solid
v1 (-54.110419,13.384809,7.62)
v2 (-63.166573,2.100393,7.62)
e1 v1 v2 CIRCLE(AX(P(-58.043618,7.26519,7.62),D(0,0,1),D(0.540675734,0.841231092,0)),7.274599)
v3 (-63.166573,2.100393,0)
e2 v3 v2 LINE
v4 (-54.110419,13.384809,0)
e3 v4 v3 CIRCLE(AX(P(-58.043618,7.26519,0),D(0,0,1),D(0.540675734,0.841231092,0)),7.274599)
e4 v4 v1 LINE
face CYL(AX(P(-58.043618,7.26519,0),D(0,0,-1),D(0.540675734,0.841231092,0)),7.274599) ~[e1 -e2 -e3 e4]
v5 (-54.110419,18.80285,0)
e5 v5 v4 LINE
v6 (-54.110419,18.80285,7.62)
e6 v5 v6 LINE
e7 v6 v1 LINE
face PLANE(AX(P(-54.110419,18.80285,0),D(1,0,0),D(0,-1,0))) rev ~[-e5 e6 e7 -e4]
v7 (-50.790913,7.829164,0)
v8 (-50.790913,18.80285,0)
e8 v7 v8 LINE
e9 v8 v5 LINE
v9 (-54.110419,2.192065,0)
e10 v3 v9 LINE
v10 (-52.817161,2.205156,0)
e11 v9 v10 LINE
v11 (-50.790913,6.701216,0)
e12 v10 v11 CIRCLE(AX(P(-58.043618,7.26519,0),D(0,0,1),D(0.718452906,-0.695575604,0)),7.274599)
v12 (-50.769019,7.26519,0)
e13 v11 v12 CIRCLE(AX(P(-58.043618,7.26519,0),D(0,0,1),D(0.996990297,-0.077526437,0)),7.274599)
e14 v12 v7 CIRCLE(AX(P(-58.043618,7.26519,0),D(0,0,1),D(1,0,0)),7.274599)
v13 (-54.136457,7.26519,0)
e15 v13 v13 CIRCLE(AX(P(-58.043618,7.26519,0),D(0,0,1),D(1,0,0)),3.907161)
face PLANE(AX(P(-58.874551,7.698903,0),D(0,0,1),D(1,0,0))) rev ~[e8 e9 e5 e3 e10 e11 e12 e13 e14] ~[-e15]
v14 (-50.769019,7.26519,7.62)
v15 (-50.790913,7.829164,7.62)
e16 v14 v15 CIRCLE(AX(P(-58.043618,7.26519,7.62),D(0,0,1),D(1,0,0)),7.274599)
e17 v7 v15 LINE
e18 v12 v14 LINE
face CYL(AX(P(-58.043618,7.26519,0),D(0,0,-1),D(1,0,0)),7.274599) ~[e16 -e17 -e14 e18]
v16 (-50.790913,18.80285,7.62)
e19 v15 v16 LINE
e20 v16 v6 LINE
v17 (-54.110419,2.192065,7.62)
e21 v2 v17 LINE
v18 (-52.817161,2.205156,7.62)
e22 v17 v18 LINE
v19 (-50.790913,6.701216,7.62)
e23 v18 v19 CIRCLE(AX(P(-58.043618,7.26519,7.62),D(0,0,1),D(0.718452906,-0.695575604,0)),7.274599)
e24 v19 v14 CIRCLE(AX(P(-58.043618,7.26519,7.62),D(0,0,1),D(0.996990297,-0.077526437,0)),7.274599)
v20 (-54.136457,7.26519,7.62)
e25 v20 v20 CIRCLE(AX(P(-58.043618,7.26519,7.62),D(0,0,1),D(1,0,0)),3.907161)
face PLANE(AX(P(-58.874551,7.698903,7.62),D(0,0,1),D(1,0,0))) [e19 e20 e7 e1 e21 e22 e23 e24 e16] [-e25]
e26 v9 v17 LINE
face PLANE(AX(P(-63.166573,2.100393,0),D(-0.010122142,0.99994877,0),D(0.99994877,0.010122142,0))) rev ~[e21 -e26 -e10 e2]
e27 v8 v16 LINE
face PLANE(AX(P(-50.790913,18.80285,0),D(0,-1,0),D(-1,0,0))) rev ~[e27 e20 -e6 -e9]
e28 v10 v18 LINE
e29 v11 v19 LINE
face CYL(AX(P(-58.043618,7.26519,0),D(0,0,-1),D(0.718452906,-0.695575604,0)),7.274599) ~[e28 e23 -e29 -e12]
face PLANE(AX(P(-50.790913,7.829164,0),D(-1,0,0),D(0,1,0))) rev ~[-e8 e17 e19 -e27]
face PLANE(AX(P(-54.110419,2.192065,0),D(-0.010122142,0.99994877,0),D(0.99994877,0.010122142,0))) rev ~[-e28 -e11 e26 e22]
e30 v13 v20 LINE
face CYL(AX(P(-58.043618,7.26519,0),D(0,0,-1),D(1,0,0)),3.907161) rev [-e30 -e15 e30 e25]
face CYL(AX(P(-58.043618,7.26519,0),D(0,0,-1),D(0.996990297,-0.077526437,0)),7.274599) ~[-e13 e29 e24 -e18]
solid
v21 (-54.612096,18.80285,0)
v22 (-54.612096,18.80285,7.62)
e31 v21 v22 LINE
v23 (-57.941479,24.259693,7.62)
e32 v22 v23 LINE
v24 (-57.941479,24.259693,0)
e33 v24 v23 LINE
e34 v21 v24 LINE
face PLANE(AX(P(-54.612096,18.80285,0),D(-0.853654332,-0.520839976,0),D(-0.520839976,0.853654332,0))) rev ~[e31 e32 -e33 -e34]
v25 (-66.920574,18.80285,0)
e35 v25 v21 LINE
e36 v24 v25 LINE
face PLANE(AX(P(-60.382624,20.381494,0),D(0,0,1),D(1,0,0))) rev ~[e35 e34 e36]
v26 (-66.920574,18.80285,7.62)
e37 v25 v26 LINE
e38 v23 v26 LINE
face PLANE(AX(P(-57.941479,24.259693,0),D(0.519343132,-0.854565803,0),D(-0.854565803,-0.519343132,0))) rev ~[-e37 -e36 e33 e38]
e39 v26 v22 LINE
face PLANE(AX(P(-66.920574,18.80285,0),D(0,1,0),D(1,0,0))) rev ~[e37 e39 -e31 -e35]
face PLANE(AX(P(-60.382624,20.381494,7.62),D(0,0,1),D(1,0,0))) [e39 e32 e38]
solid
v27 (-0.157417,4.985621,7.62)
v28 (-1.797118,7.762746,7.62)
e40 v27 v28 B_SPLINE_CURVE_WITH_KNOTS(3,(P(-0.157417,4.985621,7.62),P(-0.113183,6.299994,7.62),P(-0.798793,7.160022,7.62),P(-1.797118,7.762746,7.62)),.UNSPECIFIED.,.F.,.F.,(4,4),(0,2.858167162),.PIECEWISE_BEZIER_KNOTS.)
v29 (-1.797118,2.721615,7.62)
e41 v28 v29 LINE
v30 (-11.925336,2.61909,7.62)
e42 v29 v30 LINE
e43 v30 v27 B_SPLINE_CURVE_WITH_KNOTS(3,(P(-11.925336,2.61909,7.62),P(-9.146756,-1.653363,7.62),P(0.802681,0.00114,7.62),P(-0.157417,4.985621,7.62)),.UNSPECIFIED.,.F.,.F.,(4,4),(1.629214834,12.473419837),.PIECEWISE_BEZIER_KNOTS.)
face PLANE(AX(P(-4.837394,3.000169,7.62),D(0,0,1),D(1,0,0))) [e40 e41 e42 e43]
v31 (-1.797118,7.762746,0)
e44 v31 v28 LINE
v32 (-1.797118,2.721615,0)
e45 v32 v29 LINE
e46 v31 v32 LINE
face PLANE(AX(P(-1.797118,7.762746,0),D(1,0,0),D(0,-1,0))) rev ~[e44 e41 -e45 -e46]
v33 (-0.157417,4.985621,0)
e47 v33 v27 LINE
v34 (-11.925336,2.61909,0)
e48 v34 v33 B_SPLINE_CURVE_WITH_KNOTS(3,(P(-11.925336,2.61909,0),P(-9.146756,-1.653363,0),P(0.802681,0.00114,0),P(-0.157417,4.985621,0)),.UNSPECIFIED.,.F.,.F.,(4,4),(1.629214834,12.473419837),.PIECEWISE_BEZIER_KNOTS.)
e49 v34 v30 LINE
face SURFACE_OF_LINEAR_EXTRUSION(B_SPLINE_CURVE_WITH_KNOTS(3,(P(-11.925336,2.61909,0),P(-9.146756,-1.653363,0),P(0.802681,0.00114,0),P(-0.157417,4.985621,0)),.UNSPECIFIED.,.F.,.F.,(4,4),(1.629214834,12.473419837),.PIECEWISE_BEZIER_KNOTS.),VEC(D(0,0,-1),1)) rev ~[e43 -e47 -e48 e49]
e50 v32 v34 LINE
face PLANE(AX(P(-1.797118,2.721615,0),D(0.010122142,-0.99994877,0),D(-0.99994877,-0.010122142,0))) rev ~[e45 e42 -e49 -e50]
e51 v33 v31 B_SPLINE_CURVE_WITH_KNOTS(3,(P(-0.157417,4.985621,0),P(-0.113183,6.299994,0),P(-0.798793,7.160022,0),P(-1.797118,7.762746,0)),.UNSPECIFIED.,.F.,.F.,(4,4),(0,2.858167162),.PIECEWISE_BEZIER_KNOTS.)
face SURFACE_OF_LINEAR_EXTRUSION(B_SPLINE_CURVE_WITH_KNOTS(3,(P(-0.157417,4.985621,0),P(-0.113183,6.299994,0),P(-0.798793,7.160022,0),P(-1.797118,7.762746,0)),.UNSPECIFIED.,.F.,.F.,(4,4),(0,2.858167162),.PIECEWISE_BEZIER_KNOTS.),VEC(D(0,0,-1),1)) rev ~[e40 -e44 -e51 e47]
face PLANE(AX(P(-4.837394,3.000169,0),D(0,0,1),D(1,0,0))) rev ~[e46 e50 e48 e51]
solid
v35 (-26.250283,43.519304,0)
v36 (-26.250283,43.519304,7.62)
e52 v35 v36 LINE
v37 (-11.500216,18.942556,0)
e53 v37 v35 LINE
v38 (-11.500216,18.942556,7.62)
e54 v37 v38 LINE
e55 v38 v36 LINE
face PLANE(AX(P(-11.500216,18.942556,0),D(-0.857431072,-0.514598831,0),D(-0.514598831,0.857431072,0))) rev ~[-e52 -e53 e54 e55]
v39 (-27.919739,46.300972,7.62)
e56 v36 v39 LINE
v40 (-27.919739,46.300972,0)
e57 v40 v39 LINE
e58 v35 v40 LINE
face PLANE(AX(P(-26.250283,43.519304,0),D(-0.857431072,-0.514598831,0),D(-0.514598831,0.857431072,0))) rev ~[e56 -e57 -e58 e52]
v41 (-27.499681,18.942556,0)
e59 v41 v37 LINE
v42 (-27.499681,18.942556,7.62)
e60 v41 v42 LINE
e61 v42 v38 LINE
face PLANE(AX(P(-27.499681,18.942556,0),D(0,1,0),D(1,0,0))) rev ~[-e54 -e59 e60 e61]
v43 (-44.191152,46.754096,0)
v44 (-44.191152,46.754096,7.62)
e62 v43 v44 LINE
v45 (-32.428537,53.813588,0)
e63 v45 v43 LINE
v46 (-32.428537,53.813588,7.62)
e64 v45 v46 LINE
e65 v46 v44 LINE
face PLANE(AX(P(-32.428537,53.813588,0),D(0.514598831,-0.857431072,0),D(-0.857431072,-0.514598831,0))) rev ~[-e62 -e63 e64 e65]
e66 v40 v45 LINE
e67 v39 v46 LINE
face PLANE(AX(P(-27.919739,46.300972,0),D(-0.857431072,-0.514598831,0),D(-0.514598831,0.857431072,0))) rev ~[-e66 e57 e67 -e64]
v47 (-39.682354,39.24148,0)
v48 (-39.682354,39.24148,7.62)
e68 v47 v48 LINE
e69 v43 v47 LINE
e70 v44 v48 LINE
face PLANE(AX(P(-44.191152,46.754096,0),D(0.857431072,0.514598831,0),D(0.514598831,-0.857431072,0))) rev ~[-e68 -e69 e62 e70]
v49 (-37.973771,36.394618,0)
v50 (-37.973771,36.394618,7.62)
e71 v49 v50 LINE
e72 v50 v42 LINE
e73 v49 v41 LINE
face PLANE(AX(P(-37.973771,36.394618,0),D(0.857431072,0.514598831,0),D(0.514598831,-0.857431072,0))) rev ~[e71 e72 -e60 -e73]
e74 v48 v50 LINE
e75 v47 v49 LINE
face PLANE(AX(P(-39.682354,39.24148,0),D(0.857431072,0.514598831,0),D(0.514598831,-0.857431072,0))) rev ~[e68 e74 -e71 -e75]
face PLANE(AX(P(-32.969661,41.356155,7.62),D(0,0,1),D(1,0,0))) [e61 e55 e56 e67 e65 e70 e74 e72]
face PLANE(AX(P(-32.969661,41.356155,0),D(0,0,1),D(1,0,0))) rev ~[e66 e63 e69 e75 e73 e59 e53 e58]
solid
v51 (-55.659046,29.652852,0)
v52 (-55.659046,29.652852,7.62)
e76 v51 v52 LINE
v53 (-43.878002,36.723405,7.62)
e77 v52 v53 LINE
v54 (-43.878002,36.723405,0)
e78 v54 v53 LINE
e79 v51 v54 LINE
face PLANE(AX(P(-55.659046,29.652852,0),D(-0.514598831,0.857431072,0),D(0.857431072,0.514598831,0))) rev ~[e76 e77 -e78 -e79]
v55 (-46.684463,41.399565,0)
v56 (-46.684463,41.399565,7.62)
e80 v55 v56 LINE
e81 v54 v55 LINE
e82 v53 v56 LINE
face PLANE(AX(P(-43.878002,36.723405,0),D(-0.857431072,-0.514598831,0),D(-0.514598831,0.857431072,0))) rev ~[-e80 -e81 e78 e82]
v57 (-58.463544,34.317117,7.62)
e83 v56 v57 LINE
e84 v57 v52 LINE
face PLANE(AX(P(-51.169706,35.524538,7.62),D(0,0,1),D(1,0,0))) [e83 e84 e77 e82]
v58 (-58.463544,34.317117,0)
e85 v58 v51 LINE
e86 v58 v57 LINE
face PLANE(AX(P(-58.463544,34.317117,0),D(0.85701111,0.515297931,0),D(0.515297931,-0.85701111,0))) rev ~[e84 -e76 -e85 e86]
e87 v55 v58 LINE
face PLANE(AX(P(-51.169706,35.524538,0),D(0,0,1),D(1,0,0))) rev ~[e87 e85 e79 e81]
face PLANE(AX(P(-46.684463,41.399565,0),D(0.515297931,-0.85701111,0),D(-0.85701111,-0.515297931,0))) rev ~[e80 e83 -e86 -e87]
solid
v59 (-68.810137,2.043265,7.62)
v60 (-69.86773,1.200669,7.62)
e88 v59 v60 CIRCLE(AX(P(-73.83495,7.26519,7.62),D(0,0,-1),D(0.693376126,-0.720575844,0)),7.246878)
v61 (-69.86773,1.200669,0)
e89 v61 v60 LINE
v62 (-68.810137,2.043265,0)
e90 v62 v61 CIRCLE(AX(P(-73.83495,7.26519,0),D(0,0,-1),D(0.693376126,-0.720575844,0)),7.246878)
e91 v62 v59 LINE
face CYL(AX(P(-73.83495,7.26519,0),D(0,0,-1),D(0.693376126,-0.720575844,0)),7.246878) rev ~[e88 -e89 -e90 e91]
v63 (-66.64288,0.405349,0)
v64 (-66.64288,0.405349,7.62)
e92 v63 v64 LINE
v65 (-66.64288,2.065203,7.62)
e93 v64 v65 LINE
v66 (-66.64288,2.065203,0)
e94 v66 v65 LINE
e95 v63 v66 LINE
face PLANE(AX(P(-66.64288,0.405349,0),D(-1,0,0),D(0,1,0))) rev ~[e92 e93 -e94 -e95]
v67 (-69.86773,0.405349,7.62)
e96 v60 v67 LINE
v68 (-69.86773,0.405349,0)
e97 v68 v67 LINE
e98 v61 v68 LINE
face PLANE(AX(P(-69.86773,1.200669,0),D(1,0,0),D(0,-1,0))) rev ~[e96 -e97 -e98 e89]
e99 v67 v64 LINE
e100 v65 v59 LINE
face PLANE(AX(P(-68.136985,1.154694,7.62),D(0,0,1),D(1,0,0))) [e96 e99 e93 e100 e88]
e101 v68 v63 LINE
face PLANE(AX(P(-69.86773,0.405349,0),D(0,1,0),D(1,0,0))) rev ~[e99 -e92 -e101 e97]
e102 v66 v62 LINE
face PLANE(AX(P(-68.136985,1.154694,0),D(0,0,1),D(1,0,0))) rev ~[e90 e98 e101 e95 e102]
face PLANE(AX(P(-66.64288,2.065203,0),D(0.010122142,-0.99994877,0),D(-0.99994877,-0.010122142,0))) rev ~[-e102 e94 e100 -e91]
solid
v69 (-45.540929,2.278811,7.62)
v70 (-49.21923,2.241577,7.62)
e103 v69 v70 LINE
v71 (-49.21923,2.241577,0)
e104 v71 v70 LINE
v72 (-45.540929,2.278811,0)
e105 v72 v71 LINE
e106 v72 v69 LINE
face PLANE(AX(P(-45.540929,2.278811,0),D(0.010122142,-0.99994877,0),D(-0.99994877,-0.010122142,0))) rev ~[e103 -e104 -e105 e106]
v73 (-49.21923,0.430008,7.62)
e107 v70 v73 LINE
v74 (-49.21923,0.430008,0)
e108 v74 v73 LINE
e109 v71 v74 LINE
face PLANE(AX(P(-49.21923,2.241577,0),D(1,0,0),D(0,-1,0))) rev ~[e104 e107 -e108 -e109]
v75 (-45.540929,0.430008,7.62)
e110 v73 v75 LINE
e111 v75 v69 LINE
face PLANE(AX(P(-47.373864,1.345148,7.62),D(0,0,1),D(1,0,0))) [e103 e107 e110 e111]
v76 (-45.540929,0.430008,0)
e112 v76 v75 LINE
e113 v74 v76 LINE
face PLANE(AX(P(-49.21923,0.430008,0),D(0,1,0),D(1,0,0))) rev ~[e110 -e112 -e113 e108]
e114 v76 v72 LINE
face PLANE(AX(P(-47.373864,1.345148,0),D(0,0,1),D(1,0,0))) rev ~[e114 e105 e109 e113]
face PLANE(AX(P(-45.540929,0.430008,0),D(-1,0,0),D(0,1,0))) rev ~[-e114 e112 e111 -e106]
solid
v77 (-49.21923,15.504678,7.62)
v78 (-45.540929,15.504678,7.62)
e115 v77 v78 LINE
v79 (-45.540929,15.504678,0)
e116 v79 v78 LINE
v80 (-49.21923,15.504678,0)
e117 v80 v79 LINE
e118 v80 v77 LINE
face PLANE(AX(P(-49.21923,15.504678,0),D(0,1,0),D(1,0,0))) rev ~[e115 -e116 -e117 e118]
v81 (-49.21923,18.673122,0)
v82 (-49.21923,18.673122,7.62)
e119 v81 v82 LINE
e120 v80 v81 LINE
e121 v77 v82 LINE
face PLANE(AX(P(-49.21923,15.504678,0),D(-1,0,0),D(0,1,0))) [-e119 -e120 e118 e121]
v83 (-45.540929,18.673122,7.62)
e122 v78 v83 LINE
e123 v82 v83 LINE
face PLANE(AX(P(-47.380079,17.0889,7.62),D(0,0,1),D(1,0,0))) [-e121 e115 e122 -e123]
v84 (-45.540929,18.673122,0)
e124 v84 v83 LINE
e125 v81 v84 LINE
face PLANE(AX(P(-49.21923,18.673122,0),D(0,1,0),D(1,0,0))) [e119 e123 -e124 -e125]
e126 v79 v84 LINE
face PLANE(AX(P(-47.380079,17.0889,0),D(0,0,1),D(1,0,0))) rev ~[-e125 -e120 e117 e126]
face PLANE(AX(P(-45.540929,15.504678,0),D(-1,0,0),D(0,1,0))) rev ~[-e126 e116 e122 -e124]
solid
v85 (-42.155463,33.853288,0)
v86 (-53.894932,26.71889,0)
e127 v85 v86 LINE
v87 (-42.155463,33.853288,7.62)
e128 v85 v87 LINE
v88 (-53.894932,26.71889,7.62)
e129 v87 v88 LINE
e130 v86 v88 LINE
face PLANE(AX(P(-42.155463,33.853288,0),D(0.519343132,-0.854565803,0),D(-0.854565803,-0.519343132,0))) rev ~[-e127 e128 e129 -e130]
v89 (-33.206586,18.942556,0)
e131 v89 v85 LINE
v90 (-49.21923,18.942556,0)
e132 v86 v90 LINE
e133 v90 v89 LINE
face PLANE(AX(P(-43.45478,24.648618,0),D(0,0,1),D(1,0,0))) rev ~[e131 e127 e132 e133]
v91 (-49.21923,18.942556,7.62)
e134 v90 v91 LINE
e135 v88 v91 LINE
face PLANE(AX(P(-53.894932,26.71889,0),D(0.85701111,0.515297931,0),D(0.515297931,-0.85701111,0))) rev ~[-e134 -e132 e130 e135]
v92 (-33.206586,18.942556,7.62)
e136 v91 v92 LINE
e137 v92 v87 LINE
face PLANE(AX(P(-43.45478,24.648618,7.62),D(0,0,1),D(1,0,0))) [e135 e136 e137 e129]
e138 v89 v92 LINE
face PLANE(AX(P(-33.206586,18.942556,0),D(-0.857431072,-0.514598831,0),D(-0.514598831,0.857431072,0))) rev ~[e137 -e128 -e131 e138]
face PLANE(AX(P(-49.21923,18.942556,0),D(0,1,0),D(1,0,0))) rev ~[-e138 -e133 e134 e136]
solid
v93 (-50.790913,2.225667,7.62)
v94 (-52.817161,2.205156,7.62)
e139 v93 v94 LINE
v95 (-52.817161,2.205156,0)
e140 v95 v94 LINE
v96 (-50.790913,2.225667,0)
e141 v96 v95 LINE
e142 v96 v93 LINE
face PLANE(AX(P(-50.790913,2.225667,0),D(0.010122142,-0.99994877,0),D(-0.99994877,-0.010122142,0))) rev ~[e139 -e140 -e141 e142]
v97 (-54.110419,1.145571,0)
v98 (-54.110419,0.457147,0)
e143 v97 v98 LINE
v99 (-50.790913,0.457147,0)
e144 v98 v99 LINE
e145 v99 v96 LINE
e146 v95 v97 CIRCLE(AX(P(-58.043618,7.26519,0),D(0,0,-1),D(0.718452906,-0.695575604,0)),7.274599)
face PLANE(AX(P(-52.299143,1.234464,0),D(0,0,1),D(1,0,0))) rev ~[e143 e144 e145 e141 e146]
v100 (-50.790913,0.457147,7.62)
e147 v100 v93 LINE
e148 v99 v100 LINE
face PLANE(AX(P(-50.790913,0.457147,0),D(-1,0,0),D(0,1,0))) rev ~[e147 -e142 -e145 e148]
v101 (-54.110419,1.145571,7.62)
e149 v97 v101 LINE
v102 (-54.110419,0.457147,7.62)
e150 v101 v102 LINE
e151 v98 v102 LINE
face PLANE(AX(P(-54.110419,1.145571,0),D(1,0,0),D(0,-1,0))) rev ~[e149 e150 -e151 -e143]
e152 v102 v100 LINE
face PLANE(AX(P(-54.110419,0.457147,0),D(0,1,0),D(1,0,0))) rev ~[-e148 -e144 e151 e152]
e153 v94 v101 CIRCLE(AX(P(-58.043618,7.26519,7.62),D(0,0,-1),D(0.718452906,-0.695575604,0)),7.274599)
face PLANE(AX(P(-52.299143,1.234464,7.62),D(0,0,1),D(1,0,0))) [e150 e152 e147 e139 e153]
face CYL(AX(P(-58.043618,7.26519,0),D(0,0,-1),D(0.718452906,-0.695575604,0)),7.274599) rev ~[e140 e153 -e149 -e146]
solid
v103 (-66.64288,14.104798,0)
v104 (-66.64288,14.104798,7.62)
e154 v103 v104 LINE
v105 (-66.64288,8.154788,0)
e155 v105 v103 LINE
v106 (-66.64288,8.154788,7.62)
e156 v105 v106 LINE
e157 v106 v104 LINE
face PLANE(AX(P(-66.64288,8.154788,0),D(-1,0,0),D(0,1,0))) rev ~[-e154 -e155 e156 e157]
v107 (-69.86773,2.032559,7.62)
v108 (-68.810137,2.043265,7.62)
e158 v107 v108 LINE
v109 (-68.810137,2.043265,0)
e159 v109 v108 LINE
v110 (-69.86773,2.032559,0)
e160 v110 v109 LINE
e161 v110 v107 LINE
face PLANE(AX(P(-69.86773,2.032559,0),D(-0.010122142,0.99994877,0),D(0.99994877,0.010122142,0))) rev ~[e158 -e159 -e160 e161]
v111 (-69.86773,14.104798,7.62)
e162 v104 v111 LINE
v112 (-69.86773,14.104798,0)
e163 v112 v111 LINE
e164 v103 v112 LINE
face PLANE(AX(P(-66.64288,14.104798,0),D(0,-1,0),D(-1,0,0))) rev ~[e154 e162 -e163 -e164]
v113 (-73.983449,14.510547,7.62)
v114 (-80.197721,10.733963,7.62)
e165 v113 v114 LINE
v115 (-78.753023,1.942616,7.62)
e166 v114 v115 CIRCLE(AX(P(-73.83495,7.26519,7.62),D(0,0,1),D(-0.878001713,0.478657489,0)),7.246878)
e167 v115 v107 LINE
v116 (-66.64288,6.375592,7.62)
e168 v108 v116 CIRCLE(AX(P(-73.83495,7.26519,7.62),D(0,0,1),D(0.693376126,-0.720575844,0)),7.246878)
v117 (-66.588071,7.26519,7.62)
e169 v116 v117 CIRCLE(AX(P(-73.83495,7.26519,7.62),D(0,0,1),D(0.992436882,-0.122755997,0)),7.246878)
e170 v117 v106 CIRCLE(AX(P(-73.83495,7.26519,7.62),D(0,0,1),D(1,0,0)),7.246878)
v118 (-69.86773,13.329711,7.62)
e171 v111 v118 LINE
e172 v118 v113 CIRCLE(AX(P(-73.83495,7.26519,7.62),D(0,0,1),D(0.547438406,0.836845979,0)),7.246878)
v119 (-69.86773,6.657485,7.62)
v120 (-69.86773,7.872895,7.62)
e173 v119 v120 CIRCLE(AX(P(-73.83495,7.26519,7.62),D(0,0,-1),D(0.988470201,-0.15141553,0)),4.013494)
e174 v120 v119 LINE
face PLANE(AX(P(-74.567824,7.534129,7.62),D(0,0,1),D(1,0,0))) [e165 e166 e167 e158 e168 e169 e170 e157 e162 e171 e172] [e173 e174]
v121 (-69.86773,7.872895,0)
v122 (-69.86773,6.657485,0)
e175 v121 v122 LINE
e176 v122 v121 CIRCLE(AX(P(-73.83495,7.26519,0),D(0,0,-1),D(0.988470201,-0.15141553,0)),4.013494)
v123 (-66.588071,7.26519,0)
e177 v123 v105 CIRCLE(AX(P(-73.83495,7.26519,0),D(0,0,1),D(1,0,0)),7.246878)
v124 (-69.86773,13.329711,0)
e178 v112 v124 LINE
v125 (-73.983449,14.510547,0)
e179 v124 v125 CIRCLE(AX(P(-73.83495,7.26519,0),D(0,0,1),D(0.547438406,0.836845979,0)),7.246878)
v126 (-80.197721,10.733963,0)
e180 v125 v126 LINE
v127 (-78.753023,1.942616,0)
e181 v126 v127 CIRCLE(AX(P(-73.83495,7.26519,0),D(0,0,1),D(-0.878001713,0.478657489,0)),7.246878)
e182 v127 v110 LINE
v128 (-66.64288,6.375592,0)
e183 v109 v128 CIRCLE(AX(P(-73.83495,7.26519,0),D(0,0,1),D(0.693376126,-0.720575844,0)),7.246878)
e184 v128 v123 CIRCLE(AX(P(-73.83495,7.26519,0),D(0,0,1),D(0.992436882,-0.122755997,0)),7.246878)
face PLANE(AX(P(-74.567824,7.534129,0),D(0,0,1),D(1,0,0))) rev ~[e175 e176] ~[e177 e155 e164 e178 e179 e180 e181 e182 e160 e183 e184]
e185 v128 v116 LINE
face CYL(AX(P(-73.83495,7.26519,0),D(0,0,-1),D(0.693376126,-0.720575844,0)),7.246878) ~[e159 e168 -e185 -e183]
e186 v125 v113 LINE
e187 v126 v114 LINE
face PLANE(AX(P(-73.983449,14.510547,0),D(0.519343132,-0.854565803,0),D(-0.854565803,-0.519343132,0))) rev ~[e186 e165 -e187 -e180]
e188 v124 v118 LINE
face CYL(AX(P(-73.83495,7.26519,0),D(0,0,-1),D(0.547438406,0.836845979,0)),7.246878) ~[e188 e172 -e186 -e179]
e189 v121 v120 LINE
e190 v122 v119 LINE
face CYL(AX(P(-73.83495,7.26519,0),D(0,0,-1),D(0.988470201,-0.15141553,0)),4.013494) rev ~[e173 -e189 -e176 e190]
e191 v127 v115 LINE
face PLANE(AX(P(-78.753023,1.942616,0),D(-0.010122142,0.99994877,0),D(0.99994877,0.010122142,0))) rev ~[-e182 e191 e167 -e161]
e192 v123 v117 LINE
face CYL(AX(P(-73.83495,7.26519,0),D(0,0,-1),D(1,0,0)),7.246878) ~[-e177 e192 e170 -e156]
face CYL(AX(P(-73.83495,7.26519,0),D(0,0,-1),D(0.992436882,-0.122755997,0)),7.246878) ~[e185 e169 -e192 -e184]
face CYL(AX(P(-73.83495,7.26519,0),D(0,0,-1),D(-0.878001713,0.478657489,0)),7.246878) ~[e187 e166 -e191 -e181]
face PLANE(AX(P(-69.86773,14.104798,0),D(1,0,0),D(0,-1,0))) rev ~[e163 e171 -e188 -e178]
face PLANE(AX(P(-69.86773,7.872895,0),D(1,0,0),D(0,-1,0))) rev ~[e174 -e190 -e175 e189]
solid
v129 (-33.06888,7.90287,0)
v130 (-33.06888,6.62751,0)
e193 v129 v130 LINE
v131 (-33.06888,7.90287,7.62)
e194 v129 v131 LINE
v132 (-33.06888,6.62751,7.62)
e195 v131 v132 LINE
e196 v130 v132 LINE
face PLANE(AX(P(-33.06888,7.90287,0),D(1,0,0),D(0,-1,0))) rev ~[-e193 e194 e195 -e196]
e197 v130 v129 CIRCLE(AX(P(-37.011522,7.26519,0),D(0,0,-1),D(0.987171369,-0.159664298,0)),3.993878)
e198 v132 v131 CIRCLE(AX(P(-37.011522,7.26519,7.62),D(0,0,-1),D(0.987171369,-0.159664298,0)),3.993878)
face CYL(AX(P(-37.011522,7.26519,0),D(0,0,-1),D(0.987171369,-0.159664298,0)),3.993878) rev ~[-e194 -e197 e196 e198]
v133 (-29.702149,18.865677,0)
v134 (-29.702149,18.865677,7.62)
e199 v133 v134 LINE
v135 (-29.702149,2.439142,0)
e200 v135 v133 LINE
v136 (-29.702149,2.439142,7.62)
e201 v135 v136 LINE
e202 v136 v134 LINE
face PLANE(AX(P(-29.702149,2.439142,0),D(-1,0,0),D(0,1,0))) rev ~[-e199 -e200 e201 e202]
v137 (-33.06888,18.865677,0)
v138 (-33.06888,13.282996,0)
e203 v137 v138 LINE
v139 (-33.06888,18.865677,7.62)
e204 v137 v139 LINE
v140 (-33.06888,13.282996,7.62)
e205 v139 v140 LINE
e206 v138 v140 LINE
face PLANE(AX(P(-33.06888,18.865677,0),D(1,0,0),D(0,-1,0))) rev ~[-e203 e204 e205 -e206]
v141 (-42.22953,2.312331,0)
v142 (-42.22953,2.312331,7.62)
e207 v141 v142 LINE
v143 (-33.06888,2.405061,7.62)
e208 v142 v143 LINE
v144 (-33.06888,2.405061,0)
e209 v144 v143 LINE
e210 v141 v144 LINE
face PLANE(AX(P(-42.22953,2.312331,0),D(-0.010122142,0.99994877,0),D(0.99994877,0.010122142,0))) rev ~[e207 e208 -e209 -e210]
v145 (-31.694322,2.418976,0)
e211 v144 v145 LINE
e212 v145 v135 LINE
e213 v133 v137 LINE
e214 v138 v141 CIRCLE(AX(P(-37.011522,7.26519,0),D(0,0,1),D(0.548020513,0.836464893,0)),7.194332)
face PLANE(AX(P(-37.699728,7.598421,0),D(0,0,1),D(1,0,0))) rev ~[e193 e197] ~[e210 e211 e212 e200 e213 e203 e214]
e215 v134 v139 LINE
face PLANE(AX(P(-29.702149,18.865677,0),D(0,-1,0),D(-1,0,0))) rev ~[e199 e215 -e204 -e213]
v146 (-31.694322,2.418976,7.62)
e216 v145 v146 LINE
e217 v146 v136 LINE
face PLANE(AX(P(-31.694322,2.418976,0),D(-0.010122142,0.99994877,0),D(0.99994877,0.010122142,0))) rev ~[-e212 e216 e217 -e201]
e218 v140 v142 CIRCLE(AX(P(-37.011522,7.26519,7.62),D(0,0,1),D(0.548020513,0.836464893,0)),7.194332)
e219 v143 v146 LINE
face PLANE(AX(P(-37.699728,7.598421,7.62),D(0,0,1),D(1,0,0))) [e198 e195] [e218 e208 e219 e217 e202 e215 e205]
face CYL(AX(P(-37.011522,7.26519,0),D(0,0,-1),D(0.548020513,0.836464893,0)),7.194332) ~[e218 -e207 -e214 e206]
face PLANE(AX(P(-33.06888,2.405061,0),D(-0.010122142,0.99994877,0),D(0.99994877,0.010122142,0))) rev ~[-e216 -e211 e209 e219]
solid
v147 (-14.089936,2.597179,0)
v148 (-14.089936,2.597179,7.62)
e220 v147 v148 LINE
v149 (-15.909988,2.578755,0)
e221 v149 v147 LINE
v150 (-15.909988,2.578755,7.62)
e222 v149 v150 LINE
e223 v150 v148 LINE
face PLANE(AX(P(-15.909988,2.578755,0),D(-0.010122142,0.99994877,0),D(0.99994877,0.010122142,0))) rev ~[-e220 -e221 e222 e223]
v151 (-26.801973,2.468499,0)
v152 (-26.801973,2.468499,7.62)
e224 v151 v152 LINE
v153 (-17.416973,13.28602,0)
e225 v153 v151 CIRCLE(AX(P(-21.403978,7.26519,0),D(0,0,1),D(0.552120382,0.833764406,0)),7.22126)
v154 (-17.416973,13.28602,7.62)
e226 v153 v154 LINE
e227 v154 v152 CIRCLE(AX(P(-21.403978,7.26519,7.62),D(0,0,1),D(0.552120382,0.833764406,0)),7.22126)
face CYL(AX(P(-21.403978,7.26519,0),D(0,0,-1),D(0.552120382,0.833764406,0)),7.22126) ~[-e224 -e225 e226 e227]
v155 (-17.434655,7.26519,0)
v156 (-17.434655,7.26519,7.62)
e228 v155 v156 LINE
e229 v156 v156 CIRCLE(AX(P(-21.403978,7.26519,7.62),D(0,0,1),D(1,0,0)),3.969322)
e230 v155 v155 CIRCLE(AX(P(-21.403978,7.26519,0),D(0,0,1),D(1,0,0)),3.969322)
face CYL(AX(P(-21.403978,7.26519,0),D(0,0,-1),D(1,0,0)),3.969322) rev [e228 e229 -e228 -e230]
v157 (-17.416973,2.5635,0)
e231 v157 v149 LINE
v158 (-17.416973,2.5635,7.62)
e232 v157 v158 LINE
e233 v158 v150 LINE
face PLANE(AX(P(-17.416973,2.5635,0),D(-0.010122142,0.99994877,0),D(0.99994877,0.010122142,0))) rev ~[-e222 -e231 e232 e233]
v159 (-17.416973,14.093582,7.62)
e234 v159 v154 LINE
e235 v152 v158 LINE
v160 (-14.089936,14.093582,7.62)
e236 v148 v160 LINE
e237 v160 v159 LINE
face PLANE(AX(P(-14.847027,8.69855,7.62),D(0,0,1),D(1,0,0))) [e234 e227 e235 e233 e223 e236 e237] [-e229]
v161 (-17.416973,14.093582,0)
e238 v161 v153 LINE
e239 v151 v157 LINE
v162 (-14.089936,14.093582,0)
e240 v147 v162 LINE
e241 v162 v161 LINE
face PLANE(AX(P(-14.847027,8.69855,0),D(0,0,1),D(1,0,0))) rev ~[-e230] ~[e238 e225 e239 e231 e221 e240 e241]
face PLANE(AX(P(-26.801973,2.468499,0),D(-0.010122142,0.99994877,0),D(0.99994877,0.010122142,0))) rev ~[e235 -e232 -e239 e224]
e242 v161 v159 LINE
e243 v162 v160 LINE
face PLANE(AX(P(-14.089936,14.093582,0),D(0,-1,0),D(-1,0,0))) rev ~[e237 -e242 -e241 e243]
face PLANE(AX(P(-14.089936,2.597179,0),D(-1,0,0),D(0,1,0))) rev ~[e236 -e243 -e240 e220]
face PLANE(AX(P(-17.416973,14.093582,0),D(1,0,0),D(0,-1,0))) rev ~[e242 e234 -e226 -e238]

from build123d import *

# Parameters (mm, degrees)
F1_DEPTH = 7.62
F0_R     = 3.9071612502
F0_R_2   = 3.9693222288
F0_W     = 3.6783010967
F0_H     = 3.1684441492


with BuildPart() as f1:
    # F0 (on Top) → F1 (new body)
    with BuildSketch(Plane.XY):
        Polygon((-54.6120963991, 18.8028495759), (-57.9414791113, 24.2596925711), (-66.9205742951, 18.8028495759), align=None)
    extrude(amount=F1_DEPTH)


with BuildPart() as f1b:
    # F0 (on Top) → F1, piece 2 (new body)
    with BuildSketch(Plane.XY):
        Polygon((-58.4635436535, 34.3171171844), (-55.6590456115, 29.6528524318), (-43.8780021033, 36.7234046998), (-46.6844625771, 41.399564594), align=None)
    extrude(amount=F1_DEPTH)


with BuildPart() as f1c:
    # F0 (on Top) → F1, piece 3 (new body)
    with BuildSketch(Plane.XY):
        Polygon((-42.1554631157, 33.8532884785), (-53.8949323829, 26.718890265), (-49.2192299373, 18.9425560391), (-33.2065857947, 18.9425560391), align=None)
    extrude(amount=F1_DEPTH)


with BuildPart() as f1d:
    # F0 (on Top) → F1, piece 4 (new body)
    with BuildSketch(Plane.XY):
        with BuildLine():
            ThreePointArc((-69.8677301407, 13.3297108985), (-71.8363877974, 14.2310348582), (-73.9834488266, 14.5105465515))
            Line((-73.9834488266, 14.5105465515), (-80.197720877, 10.7339625846))
            ThreePointArc((-80.197720877, 10.7339625846), (-80.9859151306, 6.0900592734), (-78.7530233725, 1.9426163816))
            Line((-78.7530233725, 1.9426163816), (-69.8677301407, 2.0325591908))
            Line((-69.8677301407, 2.0325591908), (-69.8677301407, 6.657484785))
            ThreePointArc((-69.8677301407, 6.657484785), (-77.8484436742, 7.2651901282), (-69.8677301407, 7.8728954714))
            Line((-69.8677301407, 7.8728954714), (-69.8677301407, 13.3297108985))
        make_face()
        with BuildLine():
            Line((-69.8677301407, 14.1047984362), (-69.8677301407, 13.3297108985))
            ThreePointArc((-69.8677301407, 13.3297108985), (-67.6845522307, 11.0979247886), (-66.6428804398, 8.1547878725))
            Line((-66.6428804398, 8.1547878725), (-66.6428804398, 14.1047984362))
            Line((-66.6428804398, 14.1047984362), (-69.8677301407, 14.1047984362))
        make_face()
        with BuildLine():
            ThreePointArc((-66.6428804398, 8.1547878725), (-67.6845522307, 11.0979247886), (-69.8677301407, 13.3297108985))
            Line((-69.8677301407, 13.3297108985), (-69.8677301407, 7.8728954714))
            ThreePointArc((-69.8677301407, 7.8728954714), (-69.833040775, 7.5699224451), (-69.821455358, 7.2651901282))
            ThreePointArc((-69.821455358, 7.2651901282), (-69.833040775, 6.9604578114), (-69.8677301407, 6.657484785))
            Line((-69.8677301407, 6.657484785), (-69.8677301407, 2.0325591908))
            Line((-69.8677301407, 2.0325591908), (-68.810137273, 2.0432648447))
            ThreePointArc((-68.810137273, 2.0432648447), (-67.3537989415, 4.0229796207), (-66.6428804398, 6.375592384))
            Line((-66.6428804398, 6.375592384), (-66.6428804398, 8.1547878725))
        make_face()
        with BuildLine():
            ThreePointArc((-66.5880714472, 7.2651901282), (-66.6017866739, 7.7108324097), (-66.6428804398, 8.1547878725))
            Line((-66.6428804398, 8.1547878725), (-66.6428804398, 6.375592384))
            ThreePointArc((-66.6428804398, 6.375592384), (-66.6017866739, 6.8195478467), (-66.5880714472, 7.2651901282))
        make_face()
        with BuildLine():
            ThreePointArc((-69.821455358, 7.2651901282), (-69.833040775, 7.5699224451), (-69.8677301407, 7.8728954714))
            Line((-69.8677301407, 7.8728954714), (-69.8677301407, 6.657484785))
            ThreePointArc((-69.8677301407, 6.657484785), (-69.833040775, 6.9604578114), (-69.821455358, 7.2651901282))
        make_face()
    extrude(amount=F1_DEPTH)


with BuildPart() as f1e:
    # F0 (on Top) → F1, piece 5 (new body)
    with BuildSketch(Plane.XY):
        Polygon((-27.9197386264, 46.3009719113), (-39.6823539035, 39.2414795949), (-37.9737712473, 36.3946175894), (-26.25028293, 43.5193037403), align=None)
        Polygon((-44.1911518574, 46.7540957034), (-39.6823539035, 39.2414795949), (-27.9197386264, 46.3009719113), (-32.4285365804, 53.8135880197), align=None)
        Polygon((-26.25028293, 43.5193037403), (-37.9737712473, 36.3946175894), (-27.4996809606, 18.9425560391), (-11.5002160892, 18.9425560391), align=None)
    extrude(amount=F1_DEPTH)


with BuildPart() as f1f:
    # F0 (on Top) → F1, piece 6 (new body)
    with BuildSketch(Plane.XY):
        with BuildLine():
            ThreePointArc((-54.1104190052, 13.3848092535), (-63.7170999248, 11.8183650375), (-63.1665728512, 2.1003927329))
            Line((-63.1665728512, 2.1003927329), (-54.1104190052, 2.1920651062))
            Line((-54.1104190052, 2.1920651062), (-54.1104190052, 13.3848092535))
        make_face()
        with Locations((-58.0436183297, 7.2651901282)):
            Circle(F0_R, mode=Mode.SUBTRACT)
        with BuildLine():
            Line((-54.1104190052, 18.8028495759), (-54.1104190052, 13.3848092535))
            ThreePointArc((-54.1104190052, 13.3848092535), (-51.7988275156, 10.9964610717), (-50.790913403, 7.8291638969))
            Line((-50.790913403, 7.8291638969), (-50.790913403, 18.8028495759))
            Line((-50.790913403, 18.8028495759), (-54.1104190052, 18.8028495759))
        make_face()
        with BuildLine():
            ThreePointArc((-50.790913403, 7.8291638969), (-51.7988275156, 10.9964610717), (-54.1104190052, 13.3848092535))
            Line((-54.1104190052, 13.3848092535), (-54.1104190052, 2.1920651062))
            Line((-54.1104190052, 2.1920651062), (-52.8171613103, 2.2051563151))
            ThreePointArc((-52.8171613103, 2.2051563151), (-51.4114233914, 4.276246257), (-50.790913403, 6.7012163595))
            Line((-50.790913403, 6.7012163595), (-50.790913403, 7.8291638969))
        make_face()
        with BuildLine():
            ThreePointArc((-50.7690190167, 7.2651901282), (-50.7744946741, 7.5473894266), (-50.790913403, 7.8291638969))
            Line((-50.790913403, 7.8291638969), (-50.790913403, 6.7012163595))
            ThreePointArc((-50.790913403, 6.7012163595), (-50.7744946741, 6.9829908299), (-50.7690190167, 7.2651901282))
        make_face()
    extrude(amount=F1_DEPTH)


with BuildPart() as f1g:
    # F0 (on Top) → F1, piece 7 (new body)
    with BuildSketch(Plane.XY):
        with BuildLine():
            ThreePointArc((-52.8171613103, 2.2051563151), (-53.433248893, 1.6380870705), (-54.1104190052, 1.145571003))
            Line((-54.1104190052, 1.145571003), (-54.1104190052, 0.4571469035))
            Line((-54.1104190052, 0.4571469035), (-50.790913403, 0.4571469035))
            Line((-50.790913403, 0.4571469035), (-50.790913403, 2.2256673353))
            Line((-50.790913403, 2.2256673353), (-52.8171613103, 2.2051563151))
        make_face()
    extrude(amount=F1_DEPTH)


with BuildPart() as f1h:
    # F0 (on Top) → F1, piece 8 (new body)
    with BuildSketch(Plane.XY):
        with BuildLine():
            ThreePointArc((-68.810137273, 2.0432648447), (-69.319238061, 1.5972458978), (-69.8677301407, 1.200669358))
            Line((-69.8677301407, 1.200669358), (-69.8677301407, 0.4053486628))
            Line((-69.8677301407, 0.4053486628), (-66.6428804398, 0.4053486628))
            Line((-66.6428804398, 0.4053486628), (-66.6428804398, 2.0652032504))
            Line((-66.6428804398, 2.0652032504), (-68.810137273, 2.0432648447))
        make_face()
    extrude(amount=F1_DEPTH)


with BuildPart() as f1i:
    # F0 (on Top) → F1, piece 9 (new body)
    with BuildSketch(Plane.XY):
        Polygon((-45.5409288406, 2.2788111481), (-49.2192299373, 2.2415769539), (-49.2192299373, 0.4300079017), (-45.5409288406, 0.4300079017), align=None)
    extrude(amount=F1_DEPTH)


with BuildPart() as f1j:
    # F0 (on Top) → F1, piece 10 (new body)
    with BuildSketch(Plane.XY):
        with BuildLine():
            add(Edge.make_bspline(
                [(-0.1574168564, 4.985621199), (-0.1131827791, 6.2999939449), (-0.7987933683, 7.1600216499), (-1.7971183406, 7.7627462702)],
                knots=[0, 0, 0, 0, 2.8581671617, 2.8581671617, 2.8581671617, 2.8581671617], degree=3))
            Line((-1.7971183406, 7.7627462702), (-1.7971183406, 2.7216149028))
            Line((-1.7971183406, 2.7216149028), (-11.9253362085, 2.6190903891))
            add(Edge.make_bspline(
                [(-11.9253362085, 2.6190903891), (-9.1467564623, -1.6533627287), (0.8026806645, 0.0011403924), (-0.1574168564, 4.985621199)],
                knots=[1.6292148337, 1.6292148337, 1.6292148337, 1.6292148337, 12.4734198375, 12.4734198375, 12.4734198375, 12.4734198375], degree=3))
        make_face()
    extrude(amount=F1_DEPTH)


with BuildPart() as f1k:
    # F0 (on Top) → F1, piece 11 (new body)
    with BuildSketch(Plane.XY):
        with BuildLine():
            ThreePointArc((-33.0688804388, 13.2829963894), (-42.5337962649, 11.8763615852), (-42.229529747, 2.3123313179))
            Line((-42.229529747, 2.3123313179), (-33.0688804388, 2.4050614633))
            Line((-33.0688804388, 2.4050614633), (-33.0688804388, 6.6275104705))
            ThreePointArc((-33.0688804388, 6.6275104705), (-41.0053996041, 7.2651901282), (-33.0688804388, 7.902869786))
            Line((-33.0688804388, 7.902869786), (-33.0688804388, 13.2829963894))
        make_face()
        with BuildLine():
            Line((-33.0688804388, 18.8656765968), (-33.0688804388, 13.2829963894))
            ThreePointArc((-33.0688804388, 13.2829963894), (-30.6821030987, 10.6852589728), (-29.8171898923, 7.2651901282))
            ThreePointArc((-29.8171898923, 7.2651901282), (-30.3028664009, 4.6666608213), (-31.6943216201, 2.4189756559))
            Line((-31.6943216201, 2.4189756559), (-29.7021493316, 2.4391417402))
            Line((-29.7021493316, 2.4391417402), (-29.7021493316, 18.8656765968))
            Line((-29.7021493316, 18.8656765968), (-33.0688804388, 18.8656765968))
        make_face()
        with BuildLine():
            ThreePointArc((-29.8171898923, 7.2651901282), (-30.6821030987, 10.6852589728), (-33.0688804388, 13.2829963894))
            Line((-33.0688804388, 13.2829963894), (-33.0688804388, 7.902869786))
            ThreePointArc((-33.0688804388, 7.902869786), (-33.0304740594, 7.5850574725), (-33.0176444577, 7.2651901282))
            ThreePointArc((-33.0176444577, 7.2651901282), (-33.0304740594, 6.945322784), (-33.0688804388, 6.6275104705))
            Line((-33.0688804388, 6.6275104705), (-33.0688804388, 2.4050614633))
            Line((-33.0688804388, 2.4050614633), (-31.6943216201, 2.4189756559))
            ThreePointArc((-31.6943216201, 2.4189756559), (-30.3028664009, 4.6666608213), (-29.8171898923, 7.2651901282))
        make_face()
        with BuildLine():
            ThreePointArc((-33.0176444577, 7.2651901282), (-33.0304740594, 7.5850574725), (-33.0688804388, 7.902869786))
            Line((-33.0688804388, 7.902869786), (-33.0688804388, 6.6275104705))
            ThreePointArc((-33.0688804388, 6.6275104705), (-33.0304740594, 6.945322784), (-33.0176444577, 7.2651901282))
        make_face()
    extrude(amount=F1_DEPTH)


with BuildPart() as f1l:
    # F0 (on Top) → F1, piece 12 (new body)
    with BuildSketch(Plane.XY):
        with BuildLine():
            Line((-15.9099875813, 2.578755115), (-14.0899363905, 2.5971788758))
            Line((-14.0899363905, 2.5971788758), (-14.0899363905, 14.0935815871))
            Line((-14.0899363905, 14.0935815871), (-17.416972667, 14.0935815871))
            Line((-17.416972667, 14.0935815871), (-17.416972667, 13.2860199104))
            ThreePointArc((-17.416972667, 13.2860199104), (-15.0424605066, 10.6824550648), (-14.182717371, 7.2651901282))
            ThreePointArc((-14.182717371, 7.2651901282), (-14.628280923, 4.7678848048), (-15.9099875813, 2.578755115))
        make_face()
        with BuildLine():
            Line((-17.416972667, 2.5635004161), (-15.9099875813, 2.578755115))
            ThreePointArc((-15.9099875813, 2.578755115), (-14.628280923, 4.7678848048), (-14.182717371, 7.2651901282))
            ThreePointArc((-14.182717371, 7.2651901282), (-15.0424605066, 10.6824550648), (-17.416972667, 13.2860199104))
            Line((-17.416972667, 13.2860199104), (-17.416972667, 2.5635004161))
        make_face()
        with BuildLine():
            ThreePointArc((-17.416972667, 13.2860199104), (-26.8585548081, 11.997439908), (-26.8019732469, 2.4684992389))
            Line((-26.8019732469, 2.4684992389), (-17.416972667, 2.5635004161))
            Line((-17.416972667, 2.5635004161), (-17.416972667, 13.2860199104))
        make_face()
        with Locations((-21.4039776474, 7.2651901282)):
            Circle(F0_R_2, mode=Mode.SUBTRACT)
    extrude(amount=F1_DEPTH)


with BuildPart() as f1m:
    # F0 (on Top) → F1, piece 13 (new body)
    with BuildSketch(Plane.XY):
        with Locations((-47.380079389, 17.0888998546)):
            Rectangle(F0_W, F0_H)
    extrude(amount=F1_DEPTH)


solid = Compound([f1.part, f1b.part, f1c.part, f1d.part, f1e.part, f1f.part, f1g.part, f1h.part, f1i.part, f1j.part, f1k.part, f1l.part, f1m.part])
